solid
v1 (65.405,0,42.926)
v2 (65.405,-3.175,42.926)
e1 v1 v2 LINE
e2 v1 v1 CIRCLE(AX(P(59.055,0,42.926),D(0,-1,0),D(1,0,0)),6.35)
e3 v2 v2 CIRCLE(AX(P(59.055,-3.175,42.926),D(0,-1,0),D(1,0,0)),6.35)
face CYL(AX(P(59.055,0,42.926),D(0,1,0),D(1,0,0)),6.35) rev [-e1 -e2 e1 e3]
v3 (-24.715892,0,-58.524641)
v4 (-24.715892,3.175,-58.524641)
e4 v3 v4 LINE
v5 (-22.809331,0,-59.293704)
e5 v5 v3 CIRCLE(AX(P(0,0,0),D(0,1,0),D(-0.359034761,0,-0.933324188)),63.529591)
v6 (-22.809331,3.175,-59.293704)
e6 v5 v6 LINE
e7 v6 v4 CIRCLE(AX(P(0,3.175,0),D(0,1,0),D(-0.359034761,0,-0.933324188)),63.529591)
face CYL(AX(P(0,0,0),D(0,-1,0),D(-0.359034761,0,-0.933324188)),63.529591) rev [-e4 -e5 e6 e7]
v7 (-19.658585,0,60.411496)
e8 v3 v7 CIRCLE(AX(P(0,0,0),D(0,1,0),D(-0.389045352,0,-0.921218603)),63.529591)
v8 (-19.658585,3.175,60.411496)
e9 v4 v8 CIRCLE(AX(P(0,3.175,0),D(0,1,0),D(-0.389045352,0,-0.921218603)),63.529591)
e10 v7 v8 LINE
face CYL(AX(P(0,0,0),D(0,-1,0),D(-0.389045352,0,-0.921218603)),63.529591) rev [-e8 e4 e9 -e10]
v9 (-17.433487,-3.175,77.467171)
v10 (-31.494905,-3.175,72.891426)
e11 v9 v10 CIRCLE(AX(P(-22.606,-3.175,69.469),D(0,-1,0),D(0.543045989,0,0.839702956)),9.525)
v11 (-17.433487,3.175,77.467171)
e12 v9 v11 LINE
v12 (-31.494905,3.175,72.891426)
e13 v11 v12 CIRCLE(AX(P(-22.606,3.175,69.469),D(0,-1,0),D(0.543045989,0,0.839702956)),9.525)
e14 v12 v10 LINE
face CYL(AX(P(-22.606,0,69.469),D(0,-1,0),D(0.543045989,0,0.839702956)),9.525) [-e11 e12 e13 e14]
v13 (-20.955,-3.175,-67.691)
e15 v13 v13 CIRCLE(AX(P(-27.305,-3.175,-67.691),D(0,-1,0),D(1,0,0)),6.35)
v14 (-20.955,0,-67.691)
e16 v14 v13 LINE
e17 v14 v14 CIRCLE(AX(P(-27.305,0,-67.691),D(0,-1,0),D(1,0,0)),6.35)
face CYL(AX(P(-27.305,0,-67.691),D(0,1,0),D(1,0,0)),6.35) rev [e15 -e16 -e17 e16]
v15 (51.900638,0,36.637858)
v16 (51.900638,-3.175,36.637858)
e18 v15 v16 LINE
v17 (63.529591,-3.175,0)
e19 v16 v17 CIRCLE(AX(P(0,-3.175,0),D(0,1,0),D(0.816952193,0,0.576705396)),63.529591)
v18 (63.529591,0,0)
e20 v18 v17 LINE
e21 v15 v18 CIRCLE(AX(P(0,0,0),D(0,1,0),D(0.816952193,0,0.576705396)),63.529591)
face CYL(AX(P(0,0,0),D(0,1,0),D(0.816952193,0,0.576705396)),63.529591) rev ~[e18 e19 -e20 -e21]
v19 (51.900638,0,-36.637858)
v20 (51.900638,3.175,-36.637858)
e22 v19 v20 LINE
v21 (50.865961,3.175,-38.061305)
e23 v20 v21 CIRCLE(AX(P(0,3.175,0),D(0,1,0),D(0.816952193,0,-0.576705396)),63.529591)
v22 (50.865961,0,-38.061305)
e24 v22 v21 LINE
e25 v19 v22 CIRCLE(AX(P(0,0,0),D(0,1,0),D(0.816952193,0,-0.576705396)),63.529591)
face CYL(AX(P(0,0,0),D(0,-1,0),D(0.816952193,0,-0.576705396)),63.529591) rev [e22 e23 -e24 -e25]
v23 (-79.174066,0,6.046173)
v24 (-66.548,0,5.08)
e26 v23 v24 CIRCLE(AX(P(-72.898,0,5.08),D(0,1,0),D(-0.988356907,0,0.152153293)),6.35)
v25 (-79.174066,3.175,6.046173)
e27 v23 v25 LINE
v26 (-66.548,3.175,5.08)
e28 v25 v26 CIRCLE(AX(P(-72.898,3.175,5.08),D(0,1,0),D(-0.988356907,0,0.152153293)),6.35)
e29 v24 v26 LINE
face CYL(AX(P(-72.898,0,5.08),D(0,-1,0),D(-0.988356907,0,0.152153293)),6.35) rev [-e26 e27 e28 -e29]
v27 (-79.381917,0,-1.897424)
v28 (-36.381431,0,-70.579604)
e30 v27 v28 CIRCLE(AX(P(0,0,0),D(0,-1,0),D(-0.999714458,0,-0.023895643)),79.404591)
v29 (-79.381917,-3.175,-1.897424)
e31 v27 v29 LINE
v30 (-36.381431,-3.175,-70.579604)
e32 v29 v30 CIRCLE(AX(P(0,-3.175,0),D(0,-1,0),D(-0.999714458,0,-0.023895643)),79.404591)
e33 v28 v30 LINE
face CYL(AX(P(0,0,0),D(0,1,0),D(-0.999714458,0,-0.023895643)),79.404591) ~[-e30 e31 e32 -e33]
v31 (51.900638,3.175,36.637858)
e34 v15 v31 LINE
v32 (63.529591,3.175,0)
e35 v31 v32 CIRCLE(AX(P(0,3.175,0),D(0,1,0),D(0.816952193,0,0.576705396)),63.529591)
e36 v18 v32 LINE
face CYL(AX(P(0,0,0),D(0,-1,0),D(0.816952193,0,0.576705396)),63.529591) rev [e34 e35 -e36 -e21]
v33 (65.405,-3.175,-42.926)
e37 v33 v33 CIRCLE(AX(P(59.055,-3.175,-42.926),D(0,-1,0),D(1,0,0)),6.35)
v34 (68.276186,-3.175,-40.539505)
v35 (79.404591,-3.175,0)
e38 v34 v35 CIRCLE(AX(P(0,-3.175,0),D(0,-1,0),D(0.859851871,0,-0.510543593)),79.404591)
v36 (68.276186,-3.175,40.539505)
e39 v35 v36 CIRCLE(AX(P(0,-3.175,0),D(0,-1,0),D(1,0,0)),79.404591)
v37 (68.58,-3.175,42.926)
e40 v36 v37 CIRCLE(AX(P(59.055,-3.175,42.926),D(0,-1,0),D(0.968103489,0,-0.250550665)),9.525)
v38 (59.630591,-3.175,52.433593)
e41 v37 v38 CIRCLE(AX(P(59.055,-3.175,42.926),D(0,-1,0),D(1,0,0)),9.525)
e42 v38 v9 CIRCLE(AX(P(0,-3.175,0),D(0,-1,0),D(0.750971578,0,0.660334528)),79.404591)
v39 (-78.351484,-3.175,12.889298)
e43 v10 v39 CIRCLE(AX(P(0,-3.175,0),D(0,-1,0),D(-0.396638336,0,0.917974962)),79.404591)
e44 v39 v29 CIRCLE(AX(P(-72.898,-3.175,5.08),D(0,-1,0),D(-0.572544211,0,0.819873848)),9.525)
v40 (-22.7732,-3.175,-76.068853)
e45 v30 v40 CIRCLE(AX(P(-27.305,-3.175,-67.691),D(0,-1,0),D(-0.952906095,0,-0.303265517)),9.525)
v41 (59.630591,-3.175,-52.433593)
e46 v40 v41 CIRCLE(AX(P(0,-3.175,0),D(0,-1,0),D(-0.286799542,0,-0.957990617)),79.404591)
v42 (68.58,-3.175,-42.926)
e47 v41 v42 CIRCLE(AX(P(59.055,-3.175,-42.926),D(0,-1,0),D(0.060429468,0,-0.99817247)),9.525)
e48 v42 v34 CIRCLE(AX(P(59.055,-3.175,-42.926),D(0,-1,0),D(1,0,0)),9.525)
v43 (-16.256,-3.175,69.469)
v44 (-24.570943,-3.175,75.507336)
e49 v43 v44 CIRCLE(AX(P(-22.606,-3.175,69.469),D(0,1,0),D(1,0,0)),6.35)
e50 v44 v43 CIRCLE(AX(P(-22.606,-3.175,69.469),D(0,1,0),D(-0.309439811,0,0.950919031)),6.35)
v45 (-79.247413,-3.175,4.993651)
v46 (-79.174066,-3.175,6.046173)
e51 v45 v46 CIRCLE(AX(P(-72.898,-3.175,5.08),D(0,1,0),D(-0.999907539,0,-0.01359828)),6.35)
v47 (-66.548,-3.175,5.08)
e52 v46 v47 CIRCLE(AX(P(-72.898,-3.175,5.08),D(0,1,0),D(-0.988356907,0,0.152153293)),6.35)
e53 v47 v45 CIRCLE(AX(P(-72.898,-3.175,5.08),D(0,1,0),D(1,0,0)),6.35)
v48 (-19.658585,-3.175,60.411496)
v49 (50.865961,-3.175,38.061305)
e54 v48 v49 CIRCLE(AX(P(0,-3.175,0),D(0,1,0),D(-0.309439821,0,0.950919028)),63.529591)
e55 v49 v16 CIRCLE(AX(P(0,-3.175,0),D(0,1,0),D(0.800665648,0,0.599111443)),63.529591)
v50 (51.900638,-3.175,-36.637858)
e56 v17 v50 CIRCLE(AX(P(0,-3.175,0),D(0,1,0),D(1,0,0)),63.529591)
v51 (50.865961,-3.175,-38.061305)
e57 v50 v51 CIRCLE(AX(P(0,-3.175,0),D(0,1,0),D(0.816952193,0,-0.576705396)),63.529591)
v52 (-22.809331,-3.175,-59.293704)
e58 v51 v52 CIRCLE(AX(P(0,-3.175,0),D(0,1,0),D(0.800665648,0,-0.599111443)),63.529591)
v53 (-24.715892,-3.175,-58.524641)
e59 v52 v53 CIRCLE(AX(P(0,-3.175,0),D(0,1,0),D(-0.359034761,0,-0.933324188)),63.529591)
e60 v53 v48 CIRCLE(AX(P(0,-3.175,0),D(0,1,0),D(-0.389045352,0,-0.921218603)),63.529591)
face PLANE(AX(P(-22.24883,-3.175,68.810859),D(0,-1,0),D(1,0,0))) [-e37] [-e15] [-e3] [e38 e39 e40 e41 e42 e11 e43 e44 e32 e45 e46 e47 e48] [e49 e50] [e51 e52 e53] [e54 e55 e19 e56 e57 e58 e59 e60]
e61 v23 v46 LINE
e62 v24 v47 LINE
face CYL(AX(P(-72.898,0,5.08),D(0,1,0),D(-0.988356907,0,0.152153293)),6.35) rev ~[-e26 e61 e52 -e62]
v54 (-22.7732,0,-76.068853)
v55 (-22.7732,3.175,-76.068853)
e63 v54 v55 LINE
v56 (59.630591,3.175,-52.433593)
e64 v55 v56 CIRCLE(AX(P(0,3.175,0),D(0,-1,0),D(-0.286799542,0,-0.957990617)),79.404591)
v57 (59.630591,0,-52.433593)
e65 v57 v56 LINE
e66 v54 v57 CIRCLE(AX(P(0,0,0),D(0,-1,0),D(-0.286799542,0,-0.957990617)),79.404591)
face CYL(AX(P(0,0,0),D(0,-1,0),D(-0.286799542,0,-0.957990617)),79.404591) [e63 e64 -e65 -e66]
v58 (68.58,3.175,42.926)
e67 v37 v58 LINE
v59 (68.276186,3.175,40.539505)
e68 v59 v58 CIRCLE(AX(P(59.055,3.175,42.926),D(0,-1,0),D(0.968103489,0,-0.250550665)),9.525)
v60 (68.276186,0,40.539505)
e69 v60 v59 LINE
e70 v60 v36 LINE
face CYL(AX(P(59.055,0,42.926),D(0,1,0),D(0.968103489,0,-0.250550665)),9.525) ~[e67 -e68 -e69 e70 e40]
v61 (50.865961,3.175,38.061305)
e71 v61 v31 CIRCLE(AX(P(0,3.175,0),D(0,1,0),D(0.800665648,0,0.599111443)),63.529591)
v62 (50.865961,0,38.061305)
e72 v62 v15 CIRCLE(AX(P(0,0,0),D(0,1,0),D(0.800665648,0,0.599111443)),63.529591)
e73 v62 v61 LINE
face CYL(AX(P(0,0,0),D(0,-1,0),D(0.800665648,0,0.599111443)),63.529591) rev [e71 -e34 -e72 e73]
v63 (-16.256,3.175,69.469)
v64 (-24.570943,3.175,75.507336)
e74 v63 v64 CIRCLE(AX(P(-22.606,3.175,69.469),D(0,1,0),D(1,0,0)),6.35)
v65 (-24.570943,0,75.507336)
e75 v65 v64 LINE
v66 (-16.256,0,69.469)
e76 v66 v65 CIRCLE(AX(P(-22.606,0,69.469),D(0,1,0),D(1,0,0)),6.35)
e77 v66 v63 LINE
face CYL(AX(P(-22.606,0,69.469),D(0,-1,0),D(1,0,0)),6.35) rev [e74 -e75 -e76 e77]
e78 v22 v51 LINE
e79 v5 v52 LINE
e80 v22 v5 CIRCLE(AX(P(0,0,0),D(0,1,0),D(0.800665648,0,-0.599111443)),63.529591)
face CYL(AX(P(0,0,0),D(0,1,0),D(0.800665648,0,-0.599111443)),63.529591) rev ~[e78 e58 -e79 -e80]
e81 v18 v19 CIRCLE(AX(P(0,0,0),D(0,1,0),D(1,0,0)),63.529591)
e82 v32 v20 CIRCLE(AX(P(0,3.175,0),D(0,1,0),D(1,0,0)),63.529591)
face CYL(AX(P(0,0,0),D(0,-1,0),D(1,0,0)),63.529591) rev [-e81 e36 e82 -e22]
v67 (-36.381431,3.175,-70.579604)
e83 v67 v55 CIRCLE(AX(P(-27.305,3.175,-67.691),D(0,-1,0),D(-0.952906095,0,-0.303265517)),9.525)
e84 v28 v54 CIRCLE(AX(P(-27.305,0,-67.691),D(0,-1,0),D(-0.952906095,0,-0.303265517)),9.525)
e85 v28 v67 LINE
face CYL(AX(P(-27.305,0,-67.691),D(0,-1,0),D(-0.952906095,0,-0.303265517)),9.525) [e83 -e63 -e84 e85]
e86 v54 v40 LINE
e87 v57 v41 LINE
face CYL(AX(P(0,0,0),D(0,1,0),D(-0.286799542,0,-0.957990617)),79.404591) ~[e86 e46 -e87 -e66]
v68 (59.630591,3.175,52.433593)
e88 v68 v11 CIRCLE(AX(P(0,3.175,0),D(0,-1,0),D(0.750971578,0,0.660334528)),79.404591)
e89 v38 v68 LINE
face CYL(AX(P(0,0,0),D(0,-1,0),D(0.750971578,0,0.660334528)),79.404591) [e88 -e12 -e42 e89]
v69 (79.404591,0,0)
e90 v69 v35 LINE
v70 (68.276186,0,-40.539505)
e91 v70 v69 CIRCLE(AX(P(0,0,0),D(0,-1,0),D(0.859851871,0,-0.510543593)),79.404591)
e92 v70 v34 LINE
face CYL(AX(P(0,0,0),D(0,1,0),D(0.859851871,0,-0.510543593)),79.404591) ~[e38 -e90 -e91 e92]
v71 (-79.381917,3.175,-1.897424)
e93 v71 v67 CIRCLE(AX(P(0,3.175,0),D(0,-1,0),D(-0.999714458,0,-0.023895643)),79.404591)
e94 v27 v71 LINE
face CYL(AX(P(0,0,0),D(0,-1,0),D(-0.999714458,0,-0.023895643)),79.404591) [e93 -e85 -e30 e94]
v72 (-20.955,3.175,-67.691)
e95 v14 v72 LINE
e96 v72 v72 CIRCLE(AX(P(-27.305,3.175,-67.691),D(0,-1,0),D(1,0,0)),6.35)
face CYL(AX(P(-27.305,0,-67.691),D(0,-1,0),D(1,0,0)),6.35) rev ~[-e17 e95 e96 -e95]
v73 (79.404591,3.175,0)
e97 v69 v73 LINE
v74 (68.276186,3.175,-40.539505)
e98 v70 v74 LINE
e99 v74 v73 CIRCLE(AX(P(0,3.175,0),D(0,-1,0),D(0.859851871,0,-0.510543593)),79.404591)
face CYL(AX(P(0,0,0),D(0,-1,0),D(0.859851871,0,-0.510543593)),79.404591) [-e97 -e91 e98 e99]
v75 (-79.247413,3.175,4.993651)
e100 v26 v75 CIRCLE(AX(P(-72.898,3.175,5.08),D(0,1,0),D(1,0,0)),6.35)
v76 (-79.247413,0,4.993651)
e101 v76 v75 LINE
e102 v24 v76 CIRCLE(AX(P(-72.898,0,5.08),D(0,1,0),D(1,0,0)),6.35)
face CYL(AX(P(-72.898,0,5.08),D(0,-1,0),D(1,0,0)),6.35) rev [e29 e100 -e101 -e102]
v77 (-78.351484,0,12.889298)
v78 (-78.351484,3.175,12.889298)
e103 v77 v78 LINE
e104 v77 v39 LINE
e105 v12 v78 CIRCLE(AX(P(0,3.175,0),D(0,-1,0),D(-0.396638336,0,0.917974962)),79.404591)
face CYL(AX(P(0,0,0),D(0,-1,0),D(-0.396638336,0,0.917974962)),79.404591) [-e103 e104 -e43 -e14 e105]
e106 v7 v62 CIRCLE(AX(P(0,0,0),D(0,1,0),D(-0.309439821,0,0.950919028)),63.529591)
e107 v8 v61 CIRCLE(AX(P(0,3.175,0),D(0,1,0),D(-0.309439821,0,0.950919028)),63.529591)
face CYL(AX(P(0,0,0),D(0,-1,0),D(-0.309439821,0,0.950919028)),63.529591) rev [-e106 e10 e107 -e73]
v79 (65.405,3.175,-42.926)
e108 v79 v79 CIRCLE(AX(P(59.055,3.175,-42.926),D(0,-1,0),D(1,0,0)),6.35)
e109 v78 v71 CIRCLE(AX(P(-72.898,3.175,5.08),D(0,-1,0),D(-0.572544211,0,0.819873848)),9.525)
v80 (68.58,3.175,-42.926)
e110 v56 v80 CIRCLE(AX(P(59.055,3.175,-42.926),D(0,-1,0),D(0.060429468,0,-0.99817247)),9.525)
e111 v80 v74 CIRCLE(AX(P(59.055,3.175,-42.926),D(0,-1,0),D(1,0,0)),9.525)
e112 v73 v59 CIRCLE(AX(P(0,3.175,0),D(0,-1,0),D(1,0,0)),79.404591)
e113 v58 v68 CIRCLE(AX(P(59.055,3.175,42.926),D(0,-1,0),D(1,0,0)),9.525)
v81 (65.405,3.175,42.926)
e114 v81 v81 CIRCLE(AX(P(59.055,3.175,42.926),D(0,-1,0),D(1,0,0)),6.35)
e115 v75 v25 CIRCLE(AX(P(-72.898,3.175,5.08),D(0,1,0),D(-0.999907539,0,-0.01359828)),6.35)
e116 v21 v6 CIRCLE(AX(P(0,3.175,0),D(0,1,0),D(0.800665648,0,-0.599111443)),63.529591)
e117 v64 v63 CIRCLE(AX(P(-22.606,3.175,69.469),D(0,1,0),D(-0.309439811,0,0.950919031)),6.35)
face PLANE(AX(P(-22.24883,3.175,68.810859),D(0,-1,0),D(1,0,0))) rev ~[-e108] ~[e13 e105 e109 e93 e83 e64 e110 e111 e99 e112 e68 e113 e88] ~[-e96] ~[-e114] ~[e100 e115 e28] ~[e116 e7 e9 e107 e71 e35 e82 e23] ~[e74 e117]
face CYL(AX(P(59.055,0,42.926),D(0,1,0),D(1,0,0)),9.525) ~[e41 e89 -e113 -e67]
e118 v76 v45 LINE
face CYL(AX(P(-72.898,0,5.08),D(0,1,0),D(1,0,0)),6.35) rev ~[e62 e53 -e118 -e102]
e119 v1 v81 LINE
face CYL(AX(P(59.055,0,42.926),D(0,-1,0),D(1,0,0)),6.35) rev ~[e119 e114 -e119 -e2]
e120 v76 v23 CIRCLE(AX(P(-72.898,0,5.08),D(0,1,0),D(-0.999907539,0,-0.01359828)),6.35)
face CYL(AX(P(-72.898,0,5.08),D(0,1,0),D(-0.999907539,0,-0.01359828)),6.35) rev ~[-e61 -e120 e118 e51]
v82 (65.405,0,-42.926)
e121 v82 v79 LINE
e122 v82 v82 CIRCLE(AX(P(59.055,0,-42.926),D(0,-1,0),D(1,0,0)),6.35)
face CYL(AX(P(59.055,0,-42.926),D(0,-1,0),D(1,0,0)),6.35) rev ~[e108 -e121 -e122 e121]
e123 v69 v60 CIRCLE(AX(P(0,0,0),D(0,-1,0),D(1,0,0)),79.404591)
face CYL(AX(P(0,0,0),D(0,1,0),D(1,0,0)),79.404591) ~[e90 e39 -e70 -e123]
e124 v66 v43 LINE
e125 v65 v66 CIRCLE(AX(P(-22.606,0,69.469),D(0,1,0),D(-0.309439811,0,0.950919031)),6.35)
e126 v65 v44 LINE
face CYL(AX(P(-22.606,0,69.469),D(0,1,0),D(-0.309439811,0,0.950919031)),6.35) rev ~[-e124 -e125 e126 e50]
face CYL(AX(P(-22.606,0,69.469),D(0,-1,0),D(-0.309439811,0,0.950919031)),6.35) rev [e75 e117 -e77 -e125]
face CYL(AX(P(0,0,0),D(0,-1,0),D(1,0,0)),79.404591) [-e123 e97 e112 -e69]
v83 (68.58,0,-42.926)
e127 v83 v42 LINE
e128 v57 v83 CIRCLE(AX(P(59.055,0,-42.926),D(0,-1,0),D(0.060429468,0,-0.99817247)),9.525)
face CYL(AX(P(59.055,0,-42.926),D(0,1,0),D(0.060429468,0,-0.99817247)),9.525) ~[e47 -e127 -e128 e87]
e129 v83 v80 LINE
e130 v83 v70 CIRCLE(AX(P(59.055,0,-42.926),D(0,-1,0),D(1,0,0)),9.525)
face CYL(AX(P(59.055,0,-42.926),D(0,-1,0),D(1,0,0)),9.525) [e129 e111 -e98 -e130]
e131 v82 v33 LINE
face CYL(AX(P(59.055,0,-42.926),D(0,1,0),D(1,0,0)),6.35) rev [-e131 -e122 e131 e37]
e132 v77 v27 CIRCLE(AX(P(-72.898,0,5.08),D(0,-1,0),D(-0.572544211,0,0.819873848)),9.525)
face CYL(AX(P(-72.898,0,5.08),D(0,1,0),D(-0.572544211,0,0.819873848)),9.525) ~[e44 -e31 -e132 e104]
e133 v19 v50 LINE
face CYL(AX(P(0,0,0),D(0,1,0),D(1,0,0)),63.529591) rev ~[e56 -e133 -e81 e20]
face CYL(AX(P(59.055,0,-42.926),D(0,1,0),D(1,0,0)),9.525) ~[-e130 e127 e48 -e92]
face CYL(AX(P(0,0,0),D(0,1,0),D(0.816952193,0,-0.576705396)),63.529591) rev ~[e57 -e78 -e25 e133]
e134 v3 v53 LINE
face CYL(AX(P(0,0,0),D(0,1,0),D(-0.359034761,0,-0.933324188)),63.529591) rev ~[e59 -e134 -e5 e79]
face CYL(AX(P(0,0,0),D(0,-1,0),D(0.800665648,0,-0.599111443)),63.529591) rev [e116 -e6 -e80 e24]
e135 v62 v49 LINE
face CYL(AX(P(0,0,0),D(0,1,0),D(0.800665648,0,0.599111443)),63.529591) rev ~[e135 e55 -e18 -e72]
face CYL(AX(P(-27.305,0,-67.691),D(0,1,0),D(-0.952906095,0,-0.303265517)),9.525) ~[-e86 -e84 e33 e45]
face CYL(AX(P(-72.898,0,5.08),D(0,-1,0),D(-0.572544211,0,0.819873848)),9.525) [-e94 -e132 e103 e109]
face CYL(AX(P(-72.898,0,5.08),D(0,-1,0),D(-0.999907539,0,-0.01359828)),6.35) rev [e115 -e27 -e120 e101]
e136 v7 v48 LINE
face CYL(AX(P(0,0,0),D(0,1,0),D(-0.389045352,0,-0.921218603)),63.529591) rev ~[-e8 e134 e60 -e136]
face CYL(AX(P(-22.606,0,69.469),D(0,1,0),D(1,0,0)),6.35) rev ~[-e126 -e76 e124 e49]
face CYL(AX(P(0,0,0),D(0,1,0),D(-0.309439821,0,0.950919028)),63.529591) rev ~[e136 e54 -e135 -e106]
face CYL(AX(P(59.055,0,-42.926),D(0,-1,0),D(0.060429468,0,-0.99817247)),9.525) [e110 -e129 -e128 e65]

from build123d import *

# Parameters (mm, degrees)
F0_R     = 6.35
F1_DEPTH = 3.175


with BuildPart() as f1:
    # F0 (on Front) → F1 (new body, symmetric)
    with BuildSketch(Plane.XZ):
        with BuildLine():
            ThreePointArc((-17.4334869568, 77.4671706545), (-21.0250628511, 76.5704625087), (-24.5709427988, 75.5073358467))
            ThreePointArc((-24.5709427988, 75.5073358467), (-28.0634202853, 74.2801012289), (-31.4949046301, 72.8914259638))
            ThreePointArc((-31.4949046301, 72.8914259638), (-29.5170408255, 62.9143726492), (-19.6585851248, 60.4114964503))
            ThreePointArc((-19.6585851248, 60.4114964503), (-14.8988685075, 63.8720589464), (-13.081, 69.469))
            ThreePointArc((-13.081, 69.469), (-14.2395846465, 74.0218803116), (-17.4334869568, 77.4671706545))
        make_face()
        with BuildLine():
            ThreePointArc((-24.5709427988, 75.5073358467), (-18.8747057723, 74.6070875222), (-16.256, 69.469))
            ThreePointArc((-16.256, 69.469), (-26.3372942277, 64.3309124778), (-24.5709427988, 75.5073358467))
        make_face(mode=Mode.SUBTRACT)
        with BuildLine():
            ThreePointArc((-31.4949046301, 72.8914259638), (-28.0634202853, 74.2801012289), (-24.5709427988, 75.5073358467))
            ThreePointArc((-24.5709427988, 75.5073358467), (-21.0250628511, 76.5704625087), (-17.4334869568, 77.4671706545))
            ThreePointArc((-17.4334869568, 77.4671706545), (-25.5534143712, 78.5265037137), (-31.4949046301, 72.8914259638))
        make_face()
        with BuildLine():
            ThreePointArc((59.6305906851, 52.4335927744), (24.5319973939, 75.5199980174), (-17.4334869568, 77.4671706545))
            ThreePointArc((-17.4334869568, 77.4671706545), (-14.2395846465, 74.0218803116), (-13.081, 69.469))
            ThreePointArc((-13.081, 69.469), (-14.8988685075, 63.8720589464), (-19.6585851248, 60.4114964503))
            ThreePointArc((-19.6585851248, 60.4114964503), (19.192650723, 60.561134655), (50.8659607408, 38.0613046332))
            ThreePointArc((50.8659607408, 38.0613046332), (50.9228529034, 47.8852145144), (59.6305906851, 52.4335927744))
        make_face()
        with BuildLine():
            ThreePointArc((-19.6585851248, 60.4114964503), (-29.5170408255, 62.9143726492), (-31.4949046301, 72.8914259638))
            ThreePointArc((-31.4949046301, 72.8914259638), (-62.5829136435, 48.8719542947), (-78.3514836066, 12.8892984033))
            ThreePointArc((-78.3514836066, 12.8892984033), (-68.4945244609, 13.5260066408), (-63.373, 5.08))
            ThreePointArc((-63.373, 5.08), (-69.0923257109, -3.6516933183), (-79.3819172084, -1.8974237821))
            ThreePointArc((-79.3819172084, -1.8974237821), (-67.3022929991, -42.1365678923), (-36.3814305576, -70.5796040459))
            ThreePointArc((-36.3814305576, -70.5796040459), (-34.1498428756, -61.0672736312), (-24.7158919074, -58.5246406199))
            ThreePointArc((-24.7158919074, -58.5246406199), (-63.4722358852, 2.6989153756), (-19.6585851248, 60.4114964503))
        make_face()
        with BuildLine():
            ThreePointArc((68.58, 42.926), (65.9907092743, 49.4545191171), (59.6305906851, 52.4335927744))
            ThreePointArc((59.6305906851, 52.4335927744), (64.2293016822, 46.6871053087), (68.276185728, 40.5395049195))
            ThreePointArc((68.276185728, 40.5395049195), (68.5037411611, 41.7231220052), (68.58, 42.926))
        make_face()
        with BuildLine():
            ThreePointArc((68.276185728, 40.5395049195), (64.2293016822, 46.6871053087), (59.6305906851, 52.4335927744))
            ThreePointArc((59.6305906851, 52.4335927744), (50.9228529034, 47.8852145144), (50.8659607408, 38.0613046332))
            ThreePointArc((50.8659607408, 38.0613046332), (51.3882284212, 37.3531638847), (51.9006383071, 36.6378576855))
            ThreePointArc((51.9006383071, 36.6378576855), (61.2626352015, 33.6603660866), (68.276185728, 40.5395049195))
        make_face()
        with Locations((59.055, 42.926)):
            Circle(F0_R, mode=Mode.SUBTRACT)
        with BuildLine():
            ThreePointArc((-63.373, 5.08), (-68.4945244609, 13.5260066408), (-78.3514836066, 12.8892984033))
            ThreePointArc((-78.3514836066, 12.8892984033), (-78.8370586265, 9.4766652265), (-79.1740663586, 6.0461734122))
            ThreePointArc((-79.1740663586, 6.0461734122), (-72.4135009686, 11.4114896106), (-66.548, 5.08))
            ThreePointArc((-66.548, 5.08), (-72.8548244643, -1.2698532167), (-79.2474128734, 4.9936509246))
            ThreePointArc((-79.2474128734, 4.9936509246), (-79.3894691896, 1.5495736457), (-79.3819172084, -1.8974237821))
            ThreePointArc((-79.3819172084, -1.8974237821), (-69.0923257109, -3.6516933183), (-63.373, 5.08))
        make_face()
        with BuildLine():
            ThreePointArc((-79.1740663586, 6.0461734122), (-78.8370586265, 9.4766652265), (-78.3514836066, 12.8892984033))
            ThreePointArc((-78.3514836066, 12.8892984033), (-82.3999562618, 5.7421572308), (-79.3819172084, -1.8974237821))
            ThreePointArc((-79.3819172084, -1.8974237821), (-79.3894691896, 1.5495736457), (-79.2474128734, 4.9936509246))
            ThreePointArc((-79.2474128734, 4.9936509246), (-79.2326375079, 5.5214381539), (-79.1740663586, 6.0461734122))
        make_face()
        with BuildLine():
            ThreePointArc((79.4045905265, 0), (76.5719647362, 21.0195911739), (68.276185728, 40.5395049195))
            ThreePointArc((68.276185728, 40.5395049195), (61.2626352015, 33.6603660866), (51.9006383071, 36.6378576855))
            ThreePointArc((51.9006383071, 36.6378576855), (60.5526018111, 19.2195547913), (63.5295905265, 0))
            ThreePointArc((63.5295905265, 0), (60.5526018111, -19.2195547913), (51.9006383071, -36.6378576855))
            ThreePointArc((51.9006383071, -36.6378576855), (61.2626352015, -33.6603660866), (68.276185728, -40.5395049195))
            ThreePointArc((68.276185728, -40.5395049195), (76.5719647362, -21.0195911739), (79.4045905265, 0))
        make_face()
        with BuildLine():
            ThreePointArc((-22.8093313363, -59.2937035145), (-23.7657227015, -58.9168846507), (-24.7158919074, -58.5246406199))
            ThreePointArc((-24.7158919074, -58.5246406199), (-34.1498428756, -61.0672736312), (-36.3814305576, -70.5796040459))
            ThreePointArc((-36.3814305576, -70.5796040459), (-29.7043860041, -73.6392453031), (-22.7732002069, -76.0688526864))
            ThreePointArc((-22.7732002069, -76.0688526864), (-19.1229764719, -72.5674860284), (-17.78, -67.691))
            ThreePointArc((-17.78, -67.691), (-19.1334986379, -62.7969024847), (-22.8093313363, -59.2937035145))
        make_face()
        with Locations((-27.305, -67.691)):
            Circle(F0_R, mode=Mode.SUBTRACT)
        with BuildLine():
            ThreePointArc((-22.7732002069, -76.0688526864), (-29.7043860041, -73.6392453031), (-36.3814305576, -70.5796040459))
            ThreePointArc((-36.3814305576, -70.5796040459), (-30.8681979815, -76.5244163914), (-22.7732002069, -76.0688526864))
        make_face()
        with BuildLine():
            ThreePointArc((50.8659607408, -38.0613046332), (17.5925354611, -61.0451600745), (-22.8093313363, -59.2937035145))
            ThreePointArc((-22.8093313363, -59.2937035145), (-19.1334986379, -62.7969024847), (-17.78, -67.691))
            ThreePointArc((-17.78, -67.691), (-19.1229764719, -72.5674860284), (-22.7732002069, -76.0688526864))
            ThreePointArc((-22.7732002069, -76.0688526864), (21.892308832, -76.3270319788), (59.6305906851, -52.4335927744))
            ThreePointArc((59.6305906851, -52.4335927744), (50.9228529034, -47.8852145144), (50.8659607408, -38.0613046332))
        make_face()
        with BuildLine():
            ThreePointArc((68.58, -42.926), (68.5037411611, -41.7231220052), (68.276185728, -40.5395049195))
            ThreePointArc((68.276185728, -40.5395049195), (64.2293016822, -46.6871053087), (59.6305906851, -52.4335927744))
            ThreePointArc((59.6305906851, -52.4335927744), (65.9907092743, -49.4545191171), (68.58, -42.926))
        make_face()
        with BuildLine():
            ThreePointArc((59.6305906851, -52.4335927744), (64.2293016822, -46.6871053087), (68.276185728, -40.5395049195))
            ThreePointArc((68.276185728, -40.5395049195), (61.2626352015, -33.6603660866), (51.9006383071, -36.6378576855))
            ThreePointArc((51.9006383071, -36.6378576855), (51.3882284212, -37.3531638847), (50.8659607408, -38.0613046332))
            ThreePointArc((50.8659607408, -38.0613046332), (50.9228529034, -47.8852145144), (59.6305906851, -52.4335927744))
        make_face()
        with Locations((59.055, -42.926)):
            Circle(F0_R, mode=Mode.SUBTRACT)
    extrude(amount=F1_DEPTH, both=True)


solid = f1.part
